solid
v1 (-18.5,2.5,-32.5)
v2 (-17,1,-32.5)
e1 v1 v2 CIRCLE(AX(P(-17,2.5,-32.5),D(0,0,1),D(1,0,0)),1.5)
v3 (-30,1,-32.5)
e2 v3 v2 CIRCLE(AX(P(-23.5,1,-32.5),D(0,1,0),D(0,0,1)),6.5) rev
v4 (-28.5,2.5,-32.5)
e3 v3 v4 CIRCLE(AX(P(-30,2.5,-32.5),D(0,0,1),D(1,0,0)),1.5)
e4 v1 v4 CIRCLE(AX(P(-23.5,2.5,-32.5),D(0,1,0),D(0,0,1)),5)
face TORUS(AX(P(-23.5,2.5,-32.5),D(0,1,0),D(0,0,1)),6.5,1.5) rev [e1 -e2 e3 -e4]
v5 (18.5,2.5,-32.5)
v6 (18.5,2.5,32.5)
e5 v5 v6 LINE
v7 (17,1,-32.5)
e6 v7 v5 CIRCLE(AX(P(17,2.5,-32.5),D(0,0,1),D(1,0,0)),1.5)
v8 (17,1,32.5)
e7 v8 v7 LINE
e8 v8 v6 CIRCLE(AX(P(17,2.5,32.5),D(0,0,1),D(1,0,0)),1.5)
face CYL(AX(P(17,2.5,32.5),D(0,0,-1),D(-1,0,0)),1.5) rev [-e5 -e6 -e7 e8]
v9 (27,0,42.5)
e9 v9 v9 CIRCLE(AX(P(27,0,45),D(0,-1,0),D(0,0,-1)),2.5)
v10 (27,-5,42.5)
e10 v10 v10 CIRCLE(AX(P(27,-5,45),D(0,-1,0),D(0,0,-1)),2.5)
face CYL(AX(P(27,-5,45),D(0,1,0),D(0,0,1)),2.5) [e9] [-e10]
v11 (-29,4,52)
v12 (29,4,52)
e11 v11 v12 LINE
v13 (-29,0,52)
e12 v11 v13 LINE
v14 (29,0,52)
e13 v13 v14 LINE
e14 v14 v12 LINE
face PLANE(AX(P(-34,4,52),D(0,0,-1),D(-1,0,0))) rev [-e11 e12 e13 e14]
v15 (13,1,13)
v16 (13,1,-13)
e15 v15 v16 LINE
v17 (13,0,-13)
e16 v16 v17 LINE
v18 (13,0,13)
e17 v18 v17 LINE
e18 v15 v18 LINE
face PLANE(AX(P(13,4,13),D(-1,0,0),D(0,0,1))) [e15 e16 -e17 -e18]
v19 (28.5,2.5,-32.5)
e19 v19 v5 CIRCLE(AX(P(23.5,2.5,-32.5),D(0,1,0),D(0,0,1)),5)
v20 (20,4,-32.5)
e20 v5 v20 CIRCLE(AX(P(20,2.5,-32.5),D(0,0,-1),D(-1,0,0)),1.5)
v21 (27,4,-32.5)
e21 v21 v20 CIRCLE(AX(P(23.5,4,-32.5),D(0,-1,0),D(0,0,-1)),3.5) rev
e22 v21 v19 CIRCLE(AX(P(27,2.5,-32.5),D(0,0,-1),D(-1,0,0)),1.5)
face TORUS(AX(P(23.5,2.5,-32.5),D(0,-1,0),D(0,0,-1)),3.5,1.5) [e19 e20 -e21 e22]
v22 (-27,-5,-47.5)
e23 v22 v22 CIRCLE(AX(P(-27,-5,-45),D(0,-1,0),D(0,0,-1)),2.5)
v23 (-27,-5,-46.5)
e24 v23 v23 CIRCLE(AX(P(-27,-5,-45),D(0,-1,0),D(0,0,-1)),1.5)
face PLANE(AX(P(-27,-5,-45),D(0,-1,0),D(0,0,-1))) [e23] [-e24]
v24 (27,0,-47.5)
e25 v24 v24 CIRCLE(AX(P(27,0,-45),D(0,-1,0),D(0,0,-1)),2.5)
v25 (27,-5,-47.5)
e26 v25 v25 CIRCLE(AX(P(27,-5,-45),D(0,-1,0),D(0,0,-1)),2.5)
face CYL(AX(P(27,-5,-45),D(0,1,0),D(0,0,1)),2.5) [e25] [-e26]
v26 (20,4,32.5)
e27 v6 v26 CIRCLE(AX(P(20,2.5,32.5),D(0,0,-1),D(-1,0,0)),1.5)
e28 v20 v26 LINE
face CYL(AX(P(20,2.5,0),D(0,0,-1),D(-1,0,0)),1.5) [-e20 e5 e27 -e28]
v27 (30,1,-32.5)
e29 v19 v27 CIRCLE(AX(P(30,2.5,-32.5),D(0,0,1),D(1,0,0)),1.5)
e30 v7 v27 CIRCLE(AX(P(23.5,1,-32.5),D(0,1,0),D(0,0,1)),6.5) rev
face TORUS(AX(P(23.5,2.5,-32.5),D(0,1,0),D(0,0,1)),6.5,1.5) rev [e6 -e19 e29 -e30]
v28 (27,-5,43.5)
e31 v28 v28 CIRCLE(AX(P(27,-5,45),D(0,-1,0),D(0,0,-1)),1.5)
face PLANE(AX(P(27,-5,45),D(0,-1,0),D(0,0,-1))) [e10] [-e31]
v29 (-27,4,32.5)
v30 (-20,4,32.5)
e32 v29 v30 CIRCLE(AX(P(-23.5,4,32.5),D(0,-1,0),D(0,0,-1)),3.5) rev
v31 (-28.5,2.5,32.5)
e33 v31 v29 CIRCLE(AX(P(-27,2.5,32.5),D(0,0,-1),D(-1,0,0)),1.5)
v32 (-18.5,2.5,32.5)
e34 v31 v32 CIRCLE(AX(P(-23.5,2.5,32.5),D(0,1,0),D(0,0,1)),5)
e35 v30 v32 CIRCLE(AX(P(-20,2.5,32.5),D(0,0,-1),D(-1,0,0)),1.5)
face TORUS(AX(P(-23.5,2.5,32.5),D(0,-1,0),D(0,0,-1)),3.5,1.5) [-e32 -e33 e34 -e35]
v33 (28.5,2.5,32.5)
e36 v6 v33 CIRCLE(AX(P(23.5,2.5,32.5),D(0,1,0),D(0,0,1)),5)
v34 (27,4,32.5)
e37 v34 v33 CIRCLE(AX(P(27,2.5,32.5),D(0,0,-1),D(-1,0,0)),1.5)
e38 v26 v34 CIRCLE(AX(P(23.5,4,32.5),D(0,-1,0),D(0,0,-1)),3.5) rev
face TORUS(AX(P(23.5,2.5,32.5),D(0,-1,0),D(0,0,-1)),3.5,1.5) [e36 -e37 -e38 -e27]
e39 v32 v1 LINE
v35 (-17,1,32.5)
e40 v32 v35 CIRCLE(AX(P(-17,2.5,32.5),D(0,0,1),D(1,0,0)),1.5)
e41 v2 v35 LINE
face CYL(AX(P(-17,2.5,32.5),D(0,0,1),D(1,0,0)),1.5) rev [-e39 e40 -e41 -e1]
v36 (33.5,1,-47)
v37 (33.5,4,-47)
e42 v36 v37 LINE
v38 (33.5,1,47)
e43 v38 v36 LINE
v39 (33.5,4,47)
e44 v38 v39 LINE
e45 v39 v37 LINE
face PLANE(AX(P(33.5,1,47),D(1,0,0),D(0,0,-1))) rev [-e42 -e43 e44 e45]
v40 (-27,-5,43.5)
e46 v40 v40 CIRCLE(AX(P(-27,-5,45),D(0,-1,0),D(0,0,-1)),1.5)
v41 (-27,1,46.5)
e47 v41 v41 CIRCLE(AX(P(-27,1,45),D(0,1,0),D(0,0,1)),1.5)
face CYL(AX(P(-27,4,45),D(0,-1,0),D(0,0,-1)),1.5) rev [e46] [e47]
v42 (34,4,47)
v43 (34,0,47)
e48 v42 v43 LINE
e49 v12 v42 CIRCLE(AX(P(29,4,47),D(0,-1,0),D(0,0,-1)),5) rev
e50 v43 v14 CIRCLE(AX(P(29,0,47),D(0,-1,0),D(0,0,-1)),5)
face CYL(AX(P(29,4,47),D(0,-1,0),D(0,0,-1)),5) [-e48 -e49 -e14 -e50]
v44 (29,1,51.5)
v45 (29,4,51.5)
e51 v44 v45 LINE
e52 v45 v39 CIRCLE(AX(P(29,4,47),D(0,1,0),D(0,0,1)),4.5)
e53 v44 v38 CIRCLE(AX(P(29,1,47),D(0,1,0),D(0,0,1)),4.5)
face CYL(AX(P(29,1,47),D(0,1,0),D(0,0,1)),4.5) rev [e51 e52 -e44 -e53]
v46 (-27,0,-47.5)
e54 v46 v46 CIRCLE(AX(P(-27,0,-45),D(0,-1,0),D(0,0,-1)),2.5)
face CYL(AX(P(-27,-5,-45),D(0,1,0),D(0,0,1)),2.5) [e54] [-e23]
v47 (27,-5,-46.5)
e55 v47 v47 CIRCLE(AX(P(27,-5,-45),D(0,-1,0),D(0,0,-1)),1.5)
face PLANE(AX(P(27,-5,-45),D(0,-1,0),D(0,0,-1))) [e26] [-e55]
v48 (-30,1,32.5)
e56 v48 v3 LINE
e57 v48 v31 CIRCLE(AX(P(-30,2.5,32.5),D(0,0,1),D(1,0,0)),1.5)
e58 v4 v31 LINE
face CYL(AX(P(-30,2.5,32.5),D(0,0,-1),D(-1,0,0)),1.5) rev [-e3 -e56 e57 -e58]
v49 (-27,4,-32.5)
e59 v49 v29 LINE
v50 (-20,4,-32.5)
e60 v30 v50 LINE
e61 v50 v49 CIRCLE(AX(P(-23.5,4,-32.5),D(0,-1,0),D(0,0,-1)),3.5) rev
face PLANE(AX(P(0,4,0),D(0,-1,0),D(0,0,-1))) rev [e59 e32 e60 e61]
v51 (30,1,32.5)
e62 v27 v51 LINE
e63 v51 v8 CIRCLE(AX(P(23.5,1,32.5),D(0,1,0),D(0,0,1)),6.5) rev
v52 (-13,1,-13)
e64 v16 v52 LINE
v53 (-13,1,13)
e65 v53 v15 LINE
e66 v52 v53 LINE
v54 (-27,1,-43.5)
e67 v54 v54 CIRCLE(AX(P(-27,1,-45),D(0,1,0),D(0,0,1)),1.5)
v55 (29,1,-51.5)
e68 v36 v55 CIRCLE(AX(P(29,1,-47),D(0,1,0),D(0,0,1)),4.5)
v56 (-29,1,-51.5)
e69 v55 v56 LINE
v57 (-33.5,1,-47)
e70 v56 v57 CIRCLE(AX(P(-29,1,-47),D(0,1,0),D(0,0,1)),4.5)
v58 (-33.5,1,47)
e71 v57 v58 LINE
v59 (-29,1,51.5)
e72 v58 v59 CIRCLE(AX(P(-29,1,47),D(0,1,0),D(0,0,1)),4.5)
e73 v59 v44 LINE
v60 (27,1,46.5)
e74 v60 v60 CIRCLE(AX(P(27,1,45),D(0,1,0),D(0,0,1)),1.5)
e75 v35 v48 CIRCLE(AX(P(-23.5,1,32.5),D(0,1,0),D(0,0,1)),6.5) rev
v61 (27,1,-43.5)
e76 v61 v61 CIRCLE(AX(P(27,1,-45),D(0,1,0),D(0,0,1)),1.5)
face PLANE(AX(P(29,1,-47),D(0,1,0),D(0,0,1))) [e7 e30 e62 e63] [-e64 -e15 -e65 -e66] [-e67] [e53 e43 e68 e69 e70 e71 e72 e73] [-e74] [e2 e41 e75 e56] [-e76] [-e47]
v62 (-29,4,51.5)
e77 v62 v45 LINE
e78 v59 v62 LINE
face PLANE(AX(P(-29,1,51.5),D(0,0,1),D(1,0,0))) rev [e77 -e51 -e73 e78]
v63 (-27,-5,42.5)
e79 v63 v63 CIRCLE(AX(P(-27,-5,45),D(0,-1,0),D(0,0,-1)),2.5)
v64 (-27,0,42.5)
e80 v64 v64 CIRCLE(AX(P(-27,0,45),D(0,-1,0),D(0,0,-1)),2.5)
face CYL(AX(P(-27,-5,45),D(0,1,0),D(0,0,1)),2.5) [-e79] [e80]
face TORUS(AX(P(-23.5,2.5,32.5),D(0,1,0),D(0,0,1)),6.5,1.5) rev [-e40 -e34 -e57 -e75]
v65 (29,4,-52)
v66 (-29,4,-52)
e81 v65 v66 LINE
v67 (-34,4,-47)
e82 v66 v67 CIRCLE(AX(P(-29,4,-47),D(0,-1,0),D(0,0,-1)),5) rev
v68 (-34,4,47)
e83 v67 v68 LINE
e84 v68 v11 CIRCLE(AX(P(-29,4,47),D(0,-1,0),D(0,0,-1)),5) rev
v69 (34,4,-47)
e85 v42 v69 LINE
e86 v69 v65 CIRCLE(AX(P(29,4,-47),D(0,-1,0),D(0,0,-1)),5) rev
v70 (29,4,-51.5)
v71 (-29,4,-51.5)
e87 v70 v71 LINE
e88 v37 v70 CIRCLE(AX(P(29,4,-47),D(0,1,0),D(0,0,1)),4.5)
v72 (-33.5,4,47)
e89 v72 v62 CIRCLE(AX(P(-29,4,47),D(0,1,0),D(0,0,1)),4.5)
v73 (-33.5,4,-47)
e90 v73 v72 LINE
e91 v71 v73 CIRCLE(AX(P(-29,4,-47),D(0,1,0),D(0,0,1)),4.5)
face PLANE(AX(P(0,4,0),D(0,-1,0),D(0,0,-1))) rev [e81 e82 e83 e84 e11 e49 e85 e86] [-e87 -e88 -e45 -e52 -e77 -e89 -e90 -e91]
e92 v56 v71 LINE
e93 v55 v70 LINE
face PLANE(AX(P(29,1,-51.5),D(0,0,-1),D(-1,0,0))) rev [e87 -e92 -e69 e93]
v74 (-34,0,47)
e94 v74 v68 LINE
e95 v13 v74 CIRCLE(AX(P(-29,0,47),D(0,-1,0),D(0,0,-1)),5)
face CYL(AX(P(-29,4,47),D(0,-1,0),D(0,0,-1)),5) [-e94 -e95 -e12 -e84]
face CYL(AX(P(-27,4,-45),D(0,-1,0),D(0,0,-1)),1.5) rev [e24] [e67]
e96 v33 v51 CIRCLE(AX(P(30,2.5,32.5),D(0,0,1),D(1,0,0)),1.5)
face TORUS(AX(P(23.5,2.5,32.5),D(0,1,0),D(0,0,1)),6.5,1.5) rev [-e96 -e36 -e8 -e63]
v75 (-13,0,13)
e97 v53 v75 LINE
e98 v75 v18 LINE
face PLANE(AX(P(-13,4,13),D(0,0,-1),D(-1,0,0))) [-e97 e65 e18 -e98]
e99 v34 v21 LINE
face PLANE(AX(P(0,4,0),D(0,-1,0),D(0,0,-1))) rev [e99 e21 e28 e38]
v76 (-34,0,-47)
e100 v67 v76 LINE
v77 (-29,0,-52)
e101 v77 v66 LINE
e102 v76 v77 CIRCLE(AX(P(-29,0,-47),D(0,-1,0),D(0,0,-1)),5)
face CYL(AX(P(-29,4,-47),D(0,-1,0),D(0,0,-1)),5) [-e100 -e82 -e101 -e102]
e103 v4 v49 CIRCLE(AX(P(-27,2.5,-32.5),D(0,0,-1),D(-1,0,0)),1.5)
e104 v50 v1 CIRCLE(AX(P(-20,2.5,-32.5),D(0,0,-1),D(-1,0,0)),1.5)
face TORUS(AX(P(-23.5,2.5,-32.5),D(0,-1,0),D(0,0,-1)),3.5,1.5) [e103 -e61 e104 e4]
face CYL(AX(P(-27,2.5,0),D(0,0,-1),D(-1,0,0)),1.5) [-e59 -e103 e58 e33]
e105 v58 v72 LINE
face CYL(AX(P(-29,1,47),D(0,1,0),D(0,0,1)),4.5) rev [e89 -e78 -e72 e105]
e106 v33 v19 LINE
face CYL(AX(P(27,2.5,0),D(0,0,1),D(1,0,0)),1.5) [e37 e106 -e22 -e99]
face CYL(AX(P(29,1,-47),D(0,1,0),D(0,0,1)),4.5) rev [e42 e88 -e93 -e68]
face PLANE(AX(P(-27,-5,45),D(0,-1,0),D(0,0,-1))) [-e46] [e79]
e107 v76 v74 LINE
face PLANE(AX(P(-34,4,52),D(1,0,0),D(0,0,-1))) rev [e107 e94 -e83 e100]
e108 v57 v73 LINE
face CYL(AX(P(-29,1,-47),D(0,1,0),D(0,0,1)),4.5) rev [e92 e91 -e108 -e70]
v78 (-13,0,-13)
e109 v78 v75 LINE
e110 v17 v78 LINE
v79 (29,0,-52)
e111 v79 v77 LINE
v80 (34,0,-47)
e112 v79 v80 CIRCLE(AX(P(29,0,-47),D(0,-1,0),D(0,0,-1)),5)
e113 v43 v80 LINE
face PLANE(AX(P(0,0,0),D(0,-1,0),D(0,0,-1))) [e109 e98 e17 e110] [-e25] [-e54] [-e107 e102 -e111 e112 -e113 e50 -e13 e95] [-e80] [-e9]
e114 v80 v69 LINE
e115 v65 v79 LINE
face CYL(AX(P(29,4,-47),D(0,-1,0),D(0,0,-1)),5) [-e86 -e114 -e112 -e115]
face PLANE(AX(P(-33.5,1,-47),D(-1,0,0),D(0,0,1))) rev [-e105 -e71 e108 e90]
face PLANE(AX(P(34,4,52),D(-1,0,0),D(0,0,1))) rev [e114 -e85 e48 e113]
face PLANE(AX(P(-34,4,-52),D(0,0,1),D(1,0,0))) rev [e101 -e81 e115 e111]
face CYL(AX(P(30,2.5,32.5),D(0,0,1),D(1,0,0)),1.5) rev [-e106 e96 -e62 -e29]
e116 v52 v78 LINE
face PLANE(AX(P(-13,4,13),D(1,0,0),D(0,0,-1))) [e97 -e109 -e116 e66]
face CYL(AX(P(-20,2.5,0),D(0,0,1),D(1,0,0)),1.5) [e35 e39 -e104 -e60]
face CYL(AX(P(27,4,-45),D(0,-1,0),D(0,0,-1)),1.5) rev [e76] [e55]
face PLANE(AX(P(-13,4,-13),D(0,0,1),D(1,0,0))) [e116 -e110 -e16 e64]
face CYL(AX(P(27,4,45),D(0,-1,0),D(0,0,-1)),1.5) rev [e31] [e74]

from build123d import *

# Parameters (mm, degrees)
SKETCH1_W           = 68
SKETCH1_H           = 104
SKETCH1_W_2         = 26
SKETCH1_H_2         = 26
BOSS_EXTRUDE1_DEPTH = 4
FILLET1_R           = 5
CUT_EXTRUDE1_DEPTH  = 3
FILLET2_R           = 1.5
SKETCH4_R           = 2.5
BOSS_EXTRUDE2_DEPTH = 5
SKETCH5_R           = 1.5
CUT_EXTRUDE2_DEPTH  = 63.777384463


with BuildPart() as part:
    # Sketch1 → Boss-Extrude1 (new body)
    with BuildSketch(Plane(origin=(0, 0, 0), x_dir=(1, 0, 0), z_dir=(0, 1, 0))):
        Rectangle(SKETCH1_W, SKETCH1_H)
        Rectangle(SKETCH1_W_2, SKETCH1_H_2, mode=Mode.SUBTRACT)
    extrude(amount=BOSS_EXTRUDE1_DEPTH)

    # Fillet1
    fillet1_edges = [part.edges().sort_by_distance(p)[0] for p in [
        (34, 2, 52),
        (-34, 2, 52),
        (-34, 2, -52),
        (34, 2, -52),
    ]]
    fillet(fillet1_edges, radius=FILLET1_R)

    # Sketch3 → Cut-Extrude1 (cut)
    with BuildSketch(Plane(origin=(0, 4, 0), x_dir=(1, 0, 0), z_dir=(0, 1, 0))):
        with BuildLine():
            Line((29, 51.5), (-29, 51.5))
            ThreePointArc((-29, 51.5), (-32.181980515, 50.181980515), (-33.5, 47))
            Line((-33.5, 47), (-33.5, -47))
            ThreePointArc((-33.5, -47), (-32.181980515, -50.181980515), (-29, -51.5))
            Line((-29, -51.5), (29, -51.5))
            ThreePointArc((29, -51.5), (32.181980515, -50.181980515), (33.5, -47))
            Line((33.5, -47), (33.5, 47))
            ThreePointArc((33.5, 47), (32.181980515, 50.181980515), (29, 51.5))
        make_face()
        with BuildLine():
            Line((-28.5, -32.5), (-28.5, 32.5))
            ThreePointArc((-28.5, 32.5), (-23.5, 37.5), (-18.5, 32.5))
            Line((-18.5, 32.5), (-18.5, -32.5))
            ThreePointArc((-18.5, -32.5), (-23.5, -37.5), (-28.5, -32.5))
        make_face(mode=Mode.SUBTRACT)
        with BuildLine():
            Line((18.5, -32.5), (18.5, 32.5))
            ThreePointArc((18.5, 32.5), (23.5, 37.5), (28.5, 32.5))
            Line((28.5, 32.5), (28.5, -32.5))
            ThreePointArc((28.5, -32.5), (23.5, -37.5), (18.5, -32.5))
        make_face(mode=Mode.SUBTRACT)
    extrude(amount=-CUT_EXTRUDE1_DEPTH, mode=Mode.SUBTRACT)

    # Fillet2
    fillet2_edges = [part.edges().sort_by_distance(p)[0] for p in [
        (23.5, 4, -37.5),
        (28.5, 4, 0),
        (23.5, 4, 37.5),
        (23.5, 1, -37.5),
        (28.5, 1, 0),
        (23.5, 1, 37.5),
        (-23.5, 4, -37.5),
        (-18.5, 4, 0),
        (-23.5, 4, 37.5),
        (-23.5, 1, -37.5),
        (-18.5, 1, 0),
        (-23.5, 1, 37.5),
        (18.5, 4, 0),
        (18.5, 1, 0),
        (-28.5, 4, 0),
        (-28.5, 1, 0),
    ]]
    fillet(fillet2_edges, radius=FILLET2_R - 0.0001)  # a hair under: the kernel refuses the full size

    # Sketch4 → Boss-Extrude2 (add)
    with BuildSketch(Plane.XZ):
        with Locations(Location((-27, 45, 0), (0, 0, 270))):
            Circle(SKETCH4_R)
        with Locations(Location((27, 45, 0), (0, 0, 270))):
            Circle(SKETCH4_R)
        with Locations(Location((27, -45, 0), (0, 0, 270))):
            Circle(SKETCH4_R)
        with Locations(Location((-27, -45, 0), (0, 0, 270))):
            Circle(SKETCH4_R)
    extrude(amount=BOSS_EXTRUDE2_DEPTH)

    # Sketch5 → Cut-Extrude2 (cut, through all)
    with BuildSketch(Plane.XZ.offset(5)):
        with Locations(Location((-27, 45, 0), (0, 0, 270))):
            Circle(SKETCH5_R)
        with Locations(Location((27, 45, 0), (0, 0, 270))):
            Circle(SKETCH5_R)
        with Locations(Location((27, -45, 0), (0, 0, 270))):
            Circle(SKETCH5_R)
        with Locations(Location((-27, -45, 0), (0, 0, 270))):
            Circle(SKETCH5_R)
    extrude(amount=-CUT_EXTRUDE2_DEPTH, mode=Mode.SUBTRACT)


solid = part.part
